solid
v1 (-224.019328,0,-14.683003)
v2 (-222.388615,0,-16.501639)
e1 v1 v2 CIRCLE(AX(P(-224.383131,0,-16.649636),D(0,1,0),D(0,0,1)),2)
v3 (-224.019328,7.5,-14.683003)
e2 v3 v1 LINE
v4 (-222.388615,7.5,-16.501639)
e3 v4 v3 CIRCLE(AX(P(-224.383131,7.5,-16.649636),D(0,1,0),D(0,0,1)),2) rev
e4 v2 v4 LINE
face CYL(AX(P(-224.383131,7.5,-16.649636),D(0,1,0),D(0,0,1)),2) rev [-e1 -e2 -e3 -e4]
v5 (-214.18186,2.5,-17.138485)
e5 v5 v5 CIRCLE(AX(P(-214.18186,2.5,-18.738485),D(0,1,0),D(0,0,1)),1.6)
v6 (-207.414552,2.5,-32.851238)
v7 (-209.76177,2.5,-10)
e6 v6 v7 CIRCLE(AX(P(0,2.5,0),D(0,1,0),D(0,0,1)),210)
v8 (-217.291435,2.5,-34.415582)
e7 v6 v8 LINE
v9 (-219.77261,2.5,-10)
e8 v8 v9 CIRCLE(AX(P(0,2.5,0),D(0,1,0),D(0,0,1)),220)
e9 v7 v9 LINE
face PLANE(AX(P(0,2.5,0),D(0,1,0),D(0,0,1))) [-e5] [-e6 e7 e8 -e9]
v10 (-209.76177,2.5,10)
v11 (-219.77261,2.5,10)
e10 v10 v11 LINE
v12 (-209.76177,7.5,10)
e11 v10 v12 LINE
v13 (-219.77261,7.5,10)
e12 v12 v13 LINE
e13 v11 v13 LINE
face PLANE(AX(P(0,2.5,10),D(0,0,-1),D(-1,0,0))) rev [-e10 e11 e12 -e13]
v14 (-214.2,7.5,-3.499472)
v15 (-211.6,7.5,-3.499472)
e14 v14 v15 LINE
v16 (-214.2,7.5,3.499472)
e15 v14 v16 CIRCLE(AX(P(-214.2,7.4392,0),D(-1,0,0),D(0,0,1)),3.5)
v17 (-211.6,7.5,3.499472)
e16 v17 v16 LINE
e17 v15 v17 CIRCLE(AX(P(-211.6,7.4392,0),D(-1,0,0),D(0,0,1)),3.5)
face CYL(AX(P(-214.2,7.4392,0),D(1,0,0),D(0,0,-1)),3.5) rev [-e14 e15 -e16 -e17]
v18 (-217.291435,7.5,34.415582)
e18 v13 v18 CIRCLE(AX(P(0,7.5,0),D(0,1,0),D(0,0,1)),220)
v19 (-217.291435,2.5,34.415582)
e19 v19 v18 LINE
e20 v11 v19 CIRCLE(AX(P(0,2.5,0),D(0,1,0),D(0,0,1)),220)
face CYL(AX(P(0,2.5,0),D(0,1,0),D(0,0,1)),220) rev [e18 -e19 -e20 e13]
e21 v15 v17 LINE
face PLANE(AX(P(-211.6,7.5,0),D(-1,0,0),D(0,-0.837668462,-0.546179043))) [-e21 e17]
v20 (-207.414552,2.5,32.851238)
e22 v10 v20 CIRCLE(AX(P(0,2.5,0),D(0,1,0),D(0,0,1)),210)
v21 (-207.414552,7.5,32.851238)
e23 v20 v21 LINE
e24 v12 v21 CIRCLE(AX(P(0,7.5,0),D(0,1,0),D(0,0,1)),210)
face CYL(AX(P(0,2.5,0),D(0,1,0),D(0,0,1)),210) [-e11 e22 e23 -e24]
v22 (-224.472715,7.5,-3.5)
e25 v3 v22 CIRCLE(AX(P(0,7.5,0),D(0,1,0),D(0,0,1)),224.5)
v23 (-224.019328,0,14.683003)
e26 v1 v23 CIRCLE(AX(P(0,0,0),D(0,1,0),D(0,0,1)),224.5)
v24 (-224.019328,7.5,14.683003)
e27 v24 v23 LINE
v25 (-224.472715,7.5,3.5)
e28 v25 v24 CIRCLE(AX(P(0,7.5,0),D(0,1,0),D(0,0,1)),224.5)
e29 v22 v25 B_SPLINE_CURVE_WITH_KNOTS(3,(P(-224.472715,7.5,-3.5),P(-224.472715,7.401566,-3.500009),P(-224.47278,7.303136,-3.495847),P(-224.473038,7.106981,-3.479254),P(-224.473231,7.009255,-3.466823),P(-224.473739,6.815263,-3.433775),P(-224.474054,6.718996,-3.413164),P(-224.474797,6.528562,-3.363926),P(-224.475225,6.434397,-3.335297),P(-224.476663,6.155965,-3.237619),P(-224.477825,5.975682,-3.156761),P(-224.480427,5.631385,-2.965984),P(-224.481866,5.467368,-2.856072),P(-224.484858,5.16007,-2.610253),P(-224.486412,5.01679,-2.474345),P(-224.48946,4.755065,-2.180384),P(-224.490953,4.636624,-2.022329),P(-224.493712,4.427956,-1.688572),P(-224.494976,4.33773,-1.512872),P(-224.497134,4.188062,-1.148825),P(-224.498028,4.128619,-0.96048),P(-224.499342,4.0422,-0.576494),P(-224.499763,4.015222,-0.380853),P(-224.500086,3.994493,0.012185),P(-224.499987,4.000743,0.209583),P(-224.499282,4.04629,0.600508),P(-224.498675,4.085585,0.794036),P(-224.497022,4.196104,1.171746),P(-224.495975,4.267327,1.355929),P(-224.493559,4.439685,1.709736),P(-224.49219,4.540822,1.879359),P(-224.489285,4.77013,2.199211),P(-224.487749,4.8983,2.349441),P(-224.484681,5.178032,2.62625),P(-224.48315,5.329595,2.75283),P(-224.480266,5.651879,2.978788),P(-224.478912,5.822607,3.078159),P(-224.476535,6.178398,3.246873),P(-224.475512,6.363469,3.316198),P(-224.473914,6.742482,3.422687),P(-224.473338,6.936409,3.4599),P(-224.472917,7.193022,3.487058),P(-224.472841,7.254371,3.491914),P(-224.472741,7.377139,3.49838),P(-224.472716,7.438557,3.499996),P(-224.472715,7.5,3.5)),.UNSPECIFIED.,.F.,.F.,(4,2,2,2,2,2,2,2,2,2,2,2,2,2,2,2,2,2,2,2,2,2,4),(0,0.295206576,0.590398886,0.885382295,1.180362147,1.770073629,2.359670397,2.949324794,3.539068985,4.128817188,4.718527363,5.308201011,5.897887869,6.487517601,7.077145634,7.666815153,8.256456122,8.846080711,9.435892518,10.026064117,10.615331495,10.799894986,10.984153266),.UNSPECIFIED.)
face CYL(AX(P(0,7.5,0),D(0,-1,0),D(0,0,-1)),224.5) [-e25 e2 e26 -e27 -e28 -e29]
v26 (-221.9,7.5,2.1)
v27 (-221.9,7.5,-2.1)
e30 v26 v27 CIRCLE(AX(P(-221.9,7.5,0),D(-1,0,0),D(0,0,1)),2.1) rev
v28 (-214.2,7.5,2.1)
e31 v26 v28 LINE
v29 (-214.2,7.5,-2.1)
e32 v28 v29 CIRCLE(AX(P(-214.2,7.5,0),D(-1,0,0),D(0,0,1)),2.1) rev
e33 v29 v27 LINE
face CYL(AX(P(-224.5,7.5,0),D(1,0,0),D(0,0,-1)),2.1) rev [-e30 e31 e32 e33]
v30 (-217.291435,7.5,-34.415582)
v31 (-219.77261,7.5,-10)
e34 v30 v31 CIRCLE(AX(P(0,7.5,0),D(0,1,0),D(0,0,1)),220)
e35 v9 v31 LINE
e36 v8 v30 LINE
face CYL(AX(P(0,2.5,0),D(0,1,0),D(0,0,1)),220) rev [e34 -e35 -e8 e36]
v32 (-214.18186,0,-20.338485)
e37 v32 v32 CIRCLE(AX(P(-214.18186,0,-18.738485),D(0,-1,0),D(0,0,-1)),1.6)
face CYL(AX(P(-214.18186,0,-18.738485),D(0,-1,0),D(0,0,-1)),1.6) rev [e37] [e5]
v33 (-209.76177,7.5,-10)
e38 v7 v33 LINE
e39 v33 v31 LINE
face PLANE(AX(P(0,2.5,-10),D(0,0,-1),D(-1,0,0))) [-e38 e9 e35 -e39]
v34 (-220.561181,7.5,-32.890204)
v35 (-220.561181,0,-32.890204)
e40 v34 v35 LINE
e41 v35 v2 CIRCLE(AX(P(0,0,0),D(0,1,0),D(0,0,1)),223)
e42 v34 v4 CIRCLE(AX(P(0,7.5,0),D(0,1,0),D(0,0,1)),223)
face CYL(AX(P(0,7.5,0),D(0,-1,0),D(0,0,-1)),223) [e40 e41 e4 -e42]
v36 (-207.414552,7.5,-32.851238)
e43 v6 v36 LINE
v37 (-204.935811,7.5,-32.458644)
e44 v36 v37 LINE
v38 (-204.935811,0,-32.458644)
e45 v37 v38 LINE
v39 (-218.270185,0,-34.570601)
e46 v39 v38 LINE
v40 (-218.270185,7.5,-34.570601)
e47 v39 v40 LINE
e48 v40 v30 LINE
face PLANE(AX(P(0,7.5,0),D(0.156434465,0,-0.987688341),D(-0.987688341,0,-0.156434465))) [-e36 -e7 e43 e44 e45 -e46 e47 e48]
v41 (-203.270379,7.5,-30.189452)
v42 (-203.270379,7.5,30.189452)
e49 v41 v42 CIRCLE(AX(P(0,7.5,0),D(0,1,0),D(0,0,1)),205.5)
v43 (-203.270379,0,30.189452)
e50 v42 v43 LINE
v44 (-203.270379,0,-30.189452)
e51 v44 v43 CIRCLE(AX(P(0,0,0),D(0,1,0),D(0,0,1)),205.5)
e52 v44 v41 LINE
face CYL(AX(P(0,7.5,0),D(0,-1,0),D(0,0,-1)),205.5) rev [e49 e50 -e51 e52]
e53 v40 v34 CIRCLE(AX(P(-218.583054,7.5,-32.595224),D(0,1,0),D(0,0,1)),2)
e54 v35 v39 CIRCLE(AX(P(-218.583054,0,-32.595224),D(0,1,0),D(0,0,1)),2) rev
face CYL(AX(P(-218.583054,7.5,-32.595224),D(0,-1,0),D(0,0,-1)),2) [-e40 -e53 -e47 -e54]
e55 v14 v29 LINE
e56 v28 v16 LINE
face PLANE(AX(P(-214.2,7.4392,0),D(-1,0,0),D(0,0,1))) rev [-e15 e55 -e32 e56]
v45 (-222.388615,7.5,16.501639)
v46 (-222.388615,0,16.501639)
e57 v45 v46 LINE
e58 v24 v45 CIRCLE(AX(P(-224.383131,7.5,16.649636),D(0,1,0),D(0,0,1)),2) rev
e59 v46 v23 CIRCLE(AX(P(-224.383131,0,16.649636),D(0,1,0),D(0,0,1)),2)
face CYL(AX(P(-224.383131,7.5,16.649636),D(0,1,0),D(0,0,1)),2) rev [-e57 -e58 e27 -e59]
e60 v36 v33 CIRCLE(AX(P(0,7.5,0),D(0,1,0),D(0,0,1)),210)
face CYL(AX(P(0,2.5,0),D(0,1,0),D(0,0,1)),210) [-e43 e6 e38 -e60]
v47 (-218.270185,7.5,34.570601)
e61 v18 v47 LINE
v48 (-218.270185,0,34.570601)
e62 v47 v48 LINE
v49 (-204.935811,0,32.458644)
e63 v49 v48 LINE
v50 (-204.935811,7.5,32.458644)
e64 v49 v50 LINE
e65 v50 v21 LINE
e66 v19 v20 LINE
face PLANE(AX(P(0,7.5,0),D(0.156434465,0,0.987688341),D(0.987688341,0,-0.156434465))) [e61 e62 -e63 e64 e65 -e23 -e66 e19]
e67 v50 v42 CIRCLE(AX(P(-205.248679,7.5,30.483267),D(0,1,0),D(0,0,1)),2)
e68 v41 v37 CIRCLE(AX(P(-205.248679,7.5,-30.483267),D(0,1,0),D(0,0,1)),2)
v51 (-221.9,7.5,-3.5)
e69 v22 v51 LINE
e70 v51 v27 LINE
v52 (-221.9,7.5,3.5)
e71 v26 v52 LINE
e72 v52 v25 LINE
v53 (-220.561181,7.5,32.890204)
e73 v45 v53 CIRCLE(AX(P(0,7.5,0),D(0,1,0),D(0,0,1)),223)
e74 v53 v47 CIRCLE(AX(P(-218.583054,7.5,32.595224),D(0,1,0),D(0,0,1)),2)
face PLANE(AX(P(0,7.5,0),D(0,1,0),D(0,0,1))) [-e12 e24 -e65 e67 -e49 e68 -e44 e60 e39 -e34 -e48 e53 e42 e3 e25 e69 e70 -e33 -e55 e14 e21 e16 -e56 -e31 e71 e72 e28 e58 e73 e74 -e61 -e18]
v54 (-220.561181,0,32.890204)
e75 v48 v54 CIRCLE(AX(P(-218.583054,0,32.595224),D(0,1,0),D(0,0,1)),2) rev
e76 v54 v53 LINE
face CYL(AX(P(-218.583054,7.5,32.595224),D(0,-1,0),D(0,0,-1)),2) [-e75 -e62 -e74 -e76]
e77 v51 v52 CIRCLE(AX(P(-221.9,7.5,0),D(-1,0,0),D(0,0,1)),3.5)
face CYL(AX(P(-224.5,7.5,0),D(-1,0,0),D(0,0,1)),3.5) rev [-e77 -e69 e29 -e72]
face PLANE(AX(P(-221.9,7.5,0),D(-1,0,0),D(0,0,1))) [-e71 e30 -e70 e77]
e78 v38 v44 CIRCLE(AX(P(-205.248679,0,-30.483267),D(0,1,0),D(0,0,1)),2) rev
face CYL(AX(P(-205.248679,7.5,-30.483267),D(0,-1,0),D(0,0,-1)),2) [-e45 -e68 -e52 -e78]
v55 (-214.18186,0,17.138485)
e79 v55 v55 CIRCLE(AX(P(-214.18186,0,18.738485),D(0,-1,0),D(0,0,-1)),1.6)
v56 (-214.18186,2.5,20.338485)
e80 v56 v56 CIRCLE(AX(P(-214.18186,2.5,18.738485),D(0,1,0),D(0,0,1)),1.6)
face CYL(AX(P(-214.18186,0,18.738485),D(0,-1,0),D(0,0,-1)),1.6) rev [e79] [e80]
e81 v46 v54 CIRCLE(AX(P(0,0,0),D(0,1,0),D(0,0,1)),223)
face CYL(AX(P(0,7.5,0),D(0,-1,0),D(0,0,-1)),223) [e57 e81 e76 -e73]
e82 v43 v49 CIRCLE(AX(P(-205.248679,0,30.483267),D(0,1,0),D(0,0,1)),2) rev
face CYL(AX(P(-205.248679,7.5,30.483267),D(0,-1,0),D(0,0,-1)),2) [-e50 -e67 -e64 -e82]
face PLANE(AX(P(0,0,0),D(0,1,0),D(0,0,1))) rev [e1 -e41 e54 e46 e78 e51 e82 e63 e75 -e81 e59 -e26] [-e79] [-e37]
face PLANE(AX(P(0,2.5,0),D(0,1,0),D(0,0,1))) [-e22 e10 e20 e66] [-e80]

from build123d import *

# Parameters (mm, degrees)
BOSS_EXTRUDE1_DEPTH            = 7.5
BOSS_EXTRUDE2_DEPTH            = 7.5
CUT_EXTRUDE1_DEPTH             = 5
F_3_2_3_2_DIAMETER_HOLE1_D     = 3.2
FILLET1_R                      = 2
FILLET2_R                      = 2
CUT_EXTRUDE2_REACH             = 39.378
CUT_EXTRUDE2_END_RADIUS        = 224.5
SKETCH22_R                     = 2.1
CUT_EXTRUDE2_DIRECTION_2_DEPTH = 0.9
SKETCH23_R                     = 3.5
CUT_EXTRUDE3_DEPTH             = 2.6
SKETCH24_W                     = 2.6
SKETCH24_H                     = 3.5


with BuildPart() as part:
    # Sketch1 → Boss-Extrude1 (new body)
    with BuildSketch(Plane(origin=(0, 0, 0), x_dir=(1, 0, 0), z_dir=(0, 1, 0))):
        with BuildLine():
            ThreePointArc((-207.414551525, 32.851237658), (-210, 0), (-207.414551525, -32.851237658))
            Line((-207.414551525, -32.851237658), (-217.291434931, -34.415582309))
            ThreePointArc((-217.291434931, -34.415582309), (-220, 0), (-217.291434931, 34.415582309))
            Line((-217.291434931, 34.415582309), (-207.414551525, 32.851237658))
        make_face()
        with BuildLine():
            ThreePointArc((-217.291434931, -34.415582309), (-220, 0), (-217.291434931, 34.415582309))
            Line((-217.291434931, 34.415582309), (-220.254499953, 34.884885704))
            ThreePointArc((-220.254499953, 34.884885704), (-223, 0), (-220.254499953, -34.884885704))
            Line((-220.254499953, -34.884885704), (-217.291434931, -34.415582309))
        make_face()
        with BuildLine():
            Line((-202.969953992, 32.147282566), (-207.414551525, 32.851237658))
            ThreePointArc((-207.414551525, 32.851237658), (-210, 0), (-207.414551525, -32.851237658))
            Line((-207.414551525, -32.851237658), (-202.969953992, -32.147282566))
            ThreePointArc((-202.969953992, -32.147282566), (-205.5, 0), (-202.969953992, 32.147282566))
        make_face()
    extrude(amount=BOSS_EXTRUDE1_DEPTH)

    # Sketch19 → Boss-Extrude2 (add)
    with BuildSketch(Plane(origin=(0, 0, 0), x_dir=(1, 0, 0), z_dir=(0, 1, 0))):
        with BuildLine():
            Line((-224.019328267, 14.683002512), (-222.522539882, 14.584897818))
            ThreePointArc((-222.522539882, 14.584897818), (-223, 0), (-222.522539882, -14.584897818))
            Line((-222.522539882, -14.584897818), (-224.019328267, -14.683002512))
            ThreePointArc((-224.019328267, -14.683002512), (-224.5, 0), (-224.019328267, 14.683002512))
        make_face()
    extrude(amount=BOSS_EXTRUDE2_DEPTH)

    # Sketch15 → Cut-Extrude1 (cut)
    with BuildSketch(Plane(origin=(0, 7.5, 0), x_dir=(1, 0, 0), z_dir=(0, 1, 0))):
        with BuildLine():
            Line((-219.772609758, 10), (-209.761769634, 10))
            ThreePointArc((-209.761769634, 10), (-208.900850883, 21.457737542), (-207.414551525, 32.851237658))
            Line((-207.414551525, 32.851237658), (-217.291434931, 34.415582309))
            ThreePointArc((-217.291434931, 34.415582309), (-218.872736893, 22.242415451), (-219.772609758, 10))
        make_face()
        with BuildLine():
            ThreePointArc((-207.414551525, -32.851237658), (-208.900850883, -21.457737542), (-209.761769634, -10))
            Line((-209.761769634, -10), (-219.772609758, -10))
            ThreePointArc((-219.772609758, -10), (-218.872736893, -22.242415451), (-217.291434931, -34.415582309))
            Line((-217.291434931, -34.415582309), (-207.414551525, -32.851237658))
        make_face()
    extrude(amount=-CUT_EXTRUDE1_DEPTH, mode=Mode.SUBTRACT)

    # Ø3.2 (3.2) Diameter Hole1 (through all)
    with Locations(Plane(origin=(0, 0, 0), x_dir=(-1, 0, 0), z_dir=(0, -1, 0))):
        with Locations((214.18186009, -18.738484691), (214.18186009, 18.738484691)):
            Hole(F_3_2_3_2_DIAMETER_HOLE1_D / 2)

    # Fillet1
    fillet1_edges = [part.edges().sort_by_distance(p)[0] for p in [
        (-220.254499953, 3.75, 34.884885704),
        (-220.254499953, 3.75, -34.884885704),
        (-202.969953992, 3.75, -32.147282566),
        (-202.969953992, 3.75, 32.147282566),
    ]]
    fillet(fillet1_edges, radius=FILLET1_R)

    # Fillet2
    # the kernel refuses this fillet: 2 mm, written as the material it adds along each edge
    with BuildSketch(Plane(origin=(-222.522539882, 0, -14.584897818), x_dir=(0.06970140258603677, 0, -0.9975678996827931), z_dir=(0, 1, 0))) as fillet2_piece_1:
        with BuildLine():
            CenterArc((1.930030715, 1.99998144), FILLET2_R, 194.477374901, 75.275788142)
            Line((-0.006462156, 1.49998608), (-0.045192014, 1.489986173))
            ThreePointArc((-0.045192014, 1.489986173), (-0.043230707, 0.749820716), (-0.039999629, -0.000172324))
            Line((-0.039999629, -0.000172324), (0.000172324, -0.039999629))
            ThreePointArc((0.000172324, -0.039999629), (0.960707253, -0.037930577), (1.921242182, -0.039999629))
            Line((1.921242182, -0.039999629), (1.921414506, 0))
        make_face()
    extrude(amount=7.5)
    with BuildSketch(Plane(origin=(-222.522539882, 0, 14.584897818), x_dir=(-0.9978589232386029, 0, 0.06540312923015226), z_dir=(0, 1, 0))) as fillet2_piece_2:
        with BuildLine():
            CenterArc((1.991648107, 1.938628933), FILLET2_R, 180.493673912, 75.275788142)
            Line((-0.008277654, 1.921396676), (-0.048276169, 1.92105203))
            ThreePointArc((-0.048276169, 1.92105203), (-0.042069052, 0.960534929), (-0.04, 0))
            Line((-0.04, 0), (0, -0.04))
            ThreePointArc((0, -0.04), (0.75, -0.04), (1.490167038, -0.038772579))
            Line((1.490167038, -0.038772579), (1.5, 0))
        make_face()
    extrude(amount=7.5)

    # Cut-Extrude2: up to this cylinder (the profile starts inside it)
    cut_extrude2_end = Plane(origin=(0, 7.5, 0), z_dir=(0, -1, 0)) * Cylinder(CUT_EXTRUDE2_END_RADIUS, 528.756, mode=Mode.PRIVATE)
    # Sketch22 → Cut-Extrude2 (cut, up to the surface)
    with BuildSketch(Plane(origin=(-212.5, 0, 0), x_dir=(0, 0, -1), z_dir=(1, 0, 0)), mode=Mode.PRIVATE) as cut_extrude2_sk1:
        with Locations((0, 7.5)):
            Circle(SKETCH22_R)
    cut_extrude2_tool1 = extrude(cut_extrude2_sk1.sketch, amount=-CUT_EXTRUDE2_REACH, mode=Mode.PRIVATE) & cut_extrude2_end
    add(cut_extrude2_tool1.solids().sort_by_distance((-212.5, 7.5, 0))[0], mode=Mode.SUBTRACT)

    # Sketch22 → Cut-Extrude2 direction 2 (cut)
    with BuildSketch(Plane(origin=(-212.5, 0, 0), x_dir=(0, 0, -1), z_dir=(1, 0, 0))):
        with Locations((0, 7.5)):
            Circle(SKETCH22_R)
    extrude(amount=CUT_EXTRUDE2_DIRECTION_2_DEPTH, mode=Mode.SUBTRACT)

    # Sketch23 → Cut-Extrude3 (cut)
    with BuildSketch(Plane.ZY.offset(211.6)):
        with Locations((0, 7.439199918)):
            Circle(SKETCH23_R)
    extrude(amount=CUT_EXTRUDE3_DEPTH, mode=Mode.SUBTRACT)

    # Sketch24 → Cut-Revolve1 (revolve, cut)
    with BuildSketch(Plane(origin=(0, 7.5, 0), x_dir=(1, 0, 0), z_dir=(0, 1, 0))):
        with Locations((-223.2, 1.75)):
            Rectangle(SKETCH24_W, SKETCH24_H)
    revolve(axis=Axis((-224.5, 7.5, 0), (1, 0, 0)), mode=Mode.SUBTRACT)


solid = part.part
